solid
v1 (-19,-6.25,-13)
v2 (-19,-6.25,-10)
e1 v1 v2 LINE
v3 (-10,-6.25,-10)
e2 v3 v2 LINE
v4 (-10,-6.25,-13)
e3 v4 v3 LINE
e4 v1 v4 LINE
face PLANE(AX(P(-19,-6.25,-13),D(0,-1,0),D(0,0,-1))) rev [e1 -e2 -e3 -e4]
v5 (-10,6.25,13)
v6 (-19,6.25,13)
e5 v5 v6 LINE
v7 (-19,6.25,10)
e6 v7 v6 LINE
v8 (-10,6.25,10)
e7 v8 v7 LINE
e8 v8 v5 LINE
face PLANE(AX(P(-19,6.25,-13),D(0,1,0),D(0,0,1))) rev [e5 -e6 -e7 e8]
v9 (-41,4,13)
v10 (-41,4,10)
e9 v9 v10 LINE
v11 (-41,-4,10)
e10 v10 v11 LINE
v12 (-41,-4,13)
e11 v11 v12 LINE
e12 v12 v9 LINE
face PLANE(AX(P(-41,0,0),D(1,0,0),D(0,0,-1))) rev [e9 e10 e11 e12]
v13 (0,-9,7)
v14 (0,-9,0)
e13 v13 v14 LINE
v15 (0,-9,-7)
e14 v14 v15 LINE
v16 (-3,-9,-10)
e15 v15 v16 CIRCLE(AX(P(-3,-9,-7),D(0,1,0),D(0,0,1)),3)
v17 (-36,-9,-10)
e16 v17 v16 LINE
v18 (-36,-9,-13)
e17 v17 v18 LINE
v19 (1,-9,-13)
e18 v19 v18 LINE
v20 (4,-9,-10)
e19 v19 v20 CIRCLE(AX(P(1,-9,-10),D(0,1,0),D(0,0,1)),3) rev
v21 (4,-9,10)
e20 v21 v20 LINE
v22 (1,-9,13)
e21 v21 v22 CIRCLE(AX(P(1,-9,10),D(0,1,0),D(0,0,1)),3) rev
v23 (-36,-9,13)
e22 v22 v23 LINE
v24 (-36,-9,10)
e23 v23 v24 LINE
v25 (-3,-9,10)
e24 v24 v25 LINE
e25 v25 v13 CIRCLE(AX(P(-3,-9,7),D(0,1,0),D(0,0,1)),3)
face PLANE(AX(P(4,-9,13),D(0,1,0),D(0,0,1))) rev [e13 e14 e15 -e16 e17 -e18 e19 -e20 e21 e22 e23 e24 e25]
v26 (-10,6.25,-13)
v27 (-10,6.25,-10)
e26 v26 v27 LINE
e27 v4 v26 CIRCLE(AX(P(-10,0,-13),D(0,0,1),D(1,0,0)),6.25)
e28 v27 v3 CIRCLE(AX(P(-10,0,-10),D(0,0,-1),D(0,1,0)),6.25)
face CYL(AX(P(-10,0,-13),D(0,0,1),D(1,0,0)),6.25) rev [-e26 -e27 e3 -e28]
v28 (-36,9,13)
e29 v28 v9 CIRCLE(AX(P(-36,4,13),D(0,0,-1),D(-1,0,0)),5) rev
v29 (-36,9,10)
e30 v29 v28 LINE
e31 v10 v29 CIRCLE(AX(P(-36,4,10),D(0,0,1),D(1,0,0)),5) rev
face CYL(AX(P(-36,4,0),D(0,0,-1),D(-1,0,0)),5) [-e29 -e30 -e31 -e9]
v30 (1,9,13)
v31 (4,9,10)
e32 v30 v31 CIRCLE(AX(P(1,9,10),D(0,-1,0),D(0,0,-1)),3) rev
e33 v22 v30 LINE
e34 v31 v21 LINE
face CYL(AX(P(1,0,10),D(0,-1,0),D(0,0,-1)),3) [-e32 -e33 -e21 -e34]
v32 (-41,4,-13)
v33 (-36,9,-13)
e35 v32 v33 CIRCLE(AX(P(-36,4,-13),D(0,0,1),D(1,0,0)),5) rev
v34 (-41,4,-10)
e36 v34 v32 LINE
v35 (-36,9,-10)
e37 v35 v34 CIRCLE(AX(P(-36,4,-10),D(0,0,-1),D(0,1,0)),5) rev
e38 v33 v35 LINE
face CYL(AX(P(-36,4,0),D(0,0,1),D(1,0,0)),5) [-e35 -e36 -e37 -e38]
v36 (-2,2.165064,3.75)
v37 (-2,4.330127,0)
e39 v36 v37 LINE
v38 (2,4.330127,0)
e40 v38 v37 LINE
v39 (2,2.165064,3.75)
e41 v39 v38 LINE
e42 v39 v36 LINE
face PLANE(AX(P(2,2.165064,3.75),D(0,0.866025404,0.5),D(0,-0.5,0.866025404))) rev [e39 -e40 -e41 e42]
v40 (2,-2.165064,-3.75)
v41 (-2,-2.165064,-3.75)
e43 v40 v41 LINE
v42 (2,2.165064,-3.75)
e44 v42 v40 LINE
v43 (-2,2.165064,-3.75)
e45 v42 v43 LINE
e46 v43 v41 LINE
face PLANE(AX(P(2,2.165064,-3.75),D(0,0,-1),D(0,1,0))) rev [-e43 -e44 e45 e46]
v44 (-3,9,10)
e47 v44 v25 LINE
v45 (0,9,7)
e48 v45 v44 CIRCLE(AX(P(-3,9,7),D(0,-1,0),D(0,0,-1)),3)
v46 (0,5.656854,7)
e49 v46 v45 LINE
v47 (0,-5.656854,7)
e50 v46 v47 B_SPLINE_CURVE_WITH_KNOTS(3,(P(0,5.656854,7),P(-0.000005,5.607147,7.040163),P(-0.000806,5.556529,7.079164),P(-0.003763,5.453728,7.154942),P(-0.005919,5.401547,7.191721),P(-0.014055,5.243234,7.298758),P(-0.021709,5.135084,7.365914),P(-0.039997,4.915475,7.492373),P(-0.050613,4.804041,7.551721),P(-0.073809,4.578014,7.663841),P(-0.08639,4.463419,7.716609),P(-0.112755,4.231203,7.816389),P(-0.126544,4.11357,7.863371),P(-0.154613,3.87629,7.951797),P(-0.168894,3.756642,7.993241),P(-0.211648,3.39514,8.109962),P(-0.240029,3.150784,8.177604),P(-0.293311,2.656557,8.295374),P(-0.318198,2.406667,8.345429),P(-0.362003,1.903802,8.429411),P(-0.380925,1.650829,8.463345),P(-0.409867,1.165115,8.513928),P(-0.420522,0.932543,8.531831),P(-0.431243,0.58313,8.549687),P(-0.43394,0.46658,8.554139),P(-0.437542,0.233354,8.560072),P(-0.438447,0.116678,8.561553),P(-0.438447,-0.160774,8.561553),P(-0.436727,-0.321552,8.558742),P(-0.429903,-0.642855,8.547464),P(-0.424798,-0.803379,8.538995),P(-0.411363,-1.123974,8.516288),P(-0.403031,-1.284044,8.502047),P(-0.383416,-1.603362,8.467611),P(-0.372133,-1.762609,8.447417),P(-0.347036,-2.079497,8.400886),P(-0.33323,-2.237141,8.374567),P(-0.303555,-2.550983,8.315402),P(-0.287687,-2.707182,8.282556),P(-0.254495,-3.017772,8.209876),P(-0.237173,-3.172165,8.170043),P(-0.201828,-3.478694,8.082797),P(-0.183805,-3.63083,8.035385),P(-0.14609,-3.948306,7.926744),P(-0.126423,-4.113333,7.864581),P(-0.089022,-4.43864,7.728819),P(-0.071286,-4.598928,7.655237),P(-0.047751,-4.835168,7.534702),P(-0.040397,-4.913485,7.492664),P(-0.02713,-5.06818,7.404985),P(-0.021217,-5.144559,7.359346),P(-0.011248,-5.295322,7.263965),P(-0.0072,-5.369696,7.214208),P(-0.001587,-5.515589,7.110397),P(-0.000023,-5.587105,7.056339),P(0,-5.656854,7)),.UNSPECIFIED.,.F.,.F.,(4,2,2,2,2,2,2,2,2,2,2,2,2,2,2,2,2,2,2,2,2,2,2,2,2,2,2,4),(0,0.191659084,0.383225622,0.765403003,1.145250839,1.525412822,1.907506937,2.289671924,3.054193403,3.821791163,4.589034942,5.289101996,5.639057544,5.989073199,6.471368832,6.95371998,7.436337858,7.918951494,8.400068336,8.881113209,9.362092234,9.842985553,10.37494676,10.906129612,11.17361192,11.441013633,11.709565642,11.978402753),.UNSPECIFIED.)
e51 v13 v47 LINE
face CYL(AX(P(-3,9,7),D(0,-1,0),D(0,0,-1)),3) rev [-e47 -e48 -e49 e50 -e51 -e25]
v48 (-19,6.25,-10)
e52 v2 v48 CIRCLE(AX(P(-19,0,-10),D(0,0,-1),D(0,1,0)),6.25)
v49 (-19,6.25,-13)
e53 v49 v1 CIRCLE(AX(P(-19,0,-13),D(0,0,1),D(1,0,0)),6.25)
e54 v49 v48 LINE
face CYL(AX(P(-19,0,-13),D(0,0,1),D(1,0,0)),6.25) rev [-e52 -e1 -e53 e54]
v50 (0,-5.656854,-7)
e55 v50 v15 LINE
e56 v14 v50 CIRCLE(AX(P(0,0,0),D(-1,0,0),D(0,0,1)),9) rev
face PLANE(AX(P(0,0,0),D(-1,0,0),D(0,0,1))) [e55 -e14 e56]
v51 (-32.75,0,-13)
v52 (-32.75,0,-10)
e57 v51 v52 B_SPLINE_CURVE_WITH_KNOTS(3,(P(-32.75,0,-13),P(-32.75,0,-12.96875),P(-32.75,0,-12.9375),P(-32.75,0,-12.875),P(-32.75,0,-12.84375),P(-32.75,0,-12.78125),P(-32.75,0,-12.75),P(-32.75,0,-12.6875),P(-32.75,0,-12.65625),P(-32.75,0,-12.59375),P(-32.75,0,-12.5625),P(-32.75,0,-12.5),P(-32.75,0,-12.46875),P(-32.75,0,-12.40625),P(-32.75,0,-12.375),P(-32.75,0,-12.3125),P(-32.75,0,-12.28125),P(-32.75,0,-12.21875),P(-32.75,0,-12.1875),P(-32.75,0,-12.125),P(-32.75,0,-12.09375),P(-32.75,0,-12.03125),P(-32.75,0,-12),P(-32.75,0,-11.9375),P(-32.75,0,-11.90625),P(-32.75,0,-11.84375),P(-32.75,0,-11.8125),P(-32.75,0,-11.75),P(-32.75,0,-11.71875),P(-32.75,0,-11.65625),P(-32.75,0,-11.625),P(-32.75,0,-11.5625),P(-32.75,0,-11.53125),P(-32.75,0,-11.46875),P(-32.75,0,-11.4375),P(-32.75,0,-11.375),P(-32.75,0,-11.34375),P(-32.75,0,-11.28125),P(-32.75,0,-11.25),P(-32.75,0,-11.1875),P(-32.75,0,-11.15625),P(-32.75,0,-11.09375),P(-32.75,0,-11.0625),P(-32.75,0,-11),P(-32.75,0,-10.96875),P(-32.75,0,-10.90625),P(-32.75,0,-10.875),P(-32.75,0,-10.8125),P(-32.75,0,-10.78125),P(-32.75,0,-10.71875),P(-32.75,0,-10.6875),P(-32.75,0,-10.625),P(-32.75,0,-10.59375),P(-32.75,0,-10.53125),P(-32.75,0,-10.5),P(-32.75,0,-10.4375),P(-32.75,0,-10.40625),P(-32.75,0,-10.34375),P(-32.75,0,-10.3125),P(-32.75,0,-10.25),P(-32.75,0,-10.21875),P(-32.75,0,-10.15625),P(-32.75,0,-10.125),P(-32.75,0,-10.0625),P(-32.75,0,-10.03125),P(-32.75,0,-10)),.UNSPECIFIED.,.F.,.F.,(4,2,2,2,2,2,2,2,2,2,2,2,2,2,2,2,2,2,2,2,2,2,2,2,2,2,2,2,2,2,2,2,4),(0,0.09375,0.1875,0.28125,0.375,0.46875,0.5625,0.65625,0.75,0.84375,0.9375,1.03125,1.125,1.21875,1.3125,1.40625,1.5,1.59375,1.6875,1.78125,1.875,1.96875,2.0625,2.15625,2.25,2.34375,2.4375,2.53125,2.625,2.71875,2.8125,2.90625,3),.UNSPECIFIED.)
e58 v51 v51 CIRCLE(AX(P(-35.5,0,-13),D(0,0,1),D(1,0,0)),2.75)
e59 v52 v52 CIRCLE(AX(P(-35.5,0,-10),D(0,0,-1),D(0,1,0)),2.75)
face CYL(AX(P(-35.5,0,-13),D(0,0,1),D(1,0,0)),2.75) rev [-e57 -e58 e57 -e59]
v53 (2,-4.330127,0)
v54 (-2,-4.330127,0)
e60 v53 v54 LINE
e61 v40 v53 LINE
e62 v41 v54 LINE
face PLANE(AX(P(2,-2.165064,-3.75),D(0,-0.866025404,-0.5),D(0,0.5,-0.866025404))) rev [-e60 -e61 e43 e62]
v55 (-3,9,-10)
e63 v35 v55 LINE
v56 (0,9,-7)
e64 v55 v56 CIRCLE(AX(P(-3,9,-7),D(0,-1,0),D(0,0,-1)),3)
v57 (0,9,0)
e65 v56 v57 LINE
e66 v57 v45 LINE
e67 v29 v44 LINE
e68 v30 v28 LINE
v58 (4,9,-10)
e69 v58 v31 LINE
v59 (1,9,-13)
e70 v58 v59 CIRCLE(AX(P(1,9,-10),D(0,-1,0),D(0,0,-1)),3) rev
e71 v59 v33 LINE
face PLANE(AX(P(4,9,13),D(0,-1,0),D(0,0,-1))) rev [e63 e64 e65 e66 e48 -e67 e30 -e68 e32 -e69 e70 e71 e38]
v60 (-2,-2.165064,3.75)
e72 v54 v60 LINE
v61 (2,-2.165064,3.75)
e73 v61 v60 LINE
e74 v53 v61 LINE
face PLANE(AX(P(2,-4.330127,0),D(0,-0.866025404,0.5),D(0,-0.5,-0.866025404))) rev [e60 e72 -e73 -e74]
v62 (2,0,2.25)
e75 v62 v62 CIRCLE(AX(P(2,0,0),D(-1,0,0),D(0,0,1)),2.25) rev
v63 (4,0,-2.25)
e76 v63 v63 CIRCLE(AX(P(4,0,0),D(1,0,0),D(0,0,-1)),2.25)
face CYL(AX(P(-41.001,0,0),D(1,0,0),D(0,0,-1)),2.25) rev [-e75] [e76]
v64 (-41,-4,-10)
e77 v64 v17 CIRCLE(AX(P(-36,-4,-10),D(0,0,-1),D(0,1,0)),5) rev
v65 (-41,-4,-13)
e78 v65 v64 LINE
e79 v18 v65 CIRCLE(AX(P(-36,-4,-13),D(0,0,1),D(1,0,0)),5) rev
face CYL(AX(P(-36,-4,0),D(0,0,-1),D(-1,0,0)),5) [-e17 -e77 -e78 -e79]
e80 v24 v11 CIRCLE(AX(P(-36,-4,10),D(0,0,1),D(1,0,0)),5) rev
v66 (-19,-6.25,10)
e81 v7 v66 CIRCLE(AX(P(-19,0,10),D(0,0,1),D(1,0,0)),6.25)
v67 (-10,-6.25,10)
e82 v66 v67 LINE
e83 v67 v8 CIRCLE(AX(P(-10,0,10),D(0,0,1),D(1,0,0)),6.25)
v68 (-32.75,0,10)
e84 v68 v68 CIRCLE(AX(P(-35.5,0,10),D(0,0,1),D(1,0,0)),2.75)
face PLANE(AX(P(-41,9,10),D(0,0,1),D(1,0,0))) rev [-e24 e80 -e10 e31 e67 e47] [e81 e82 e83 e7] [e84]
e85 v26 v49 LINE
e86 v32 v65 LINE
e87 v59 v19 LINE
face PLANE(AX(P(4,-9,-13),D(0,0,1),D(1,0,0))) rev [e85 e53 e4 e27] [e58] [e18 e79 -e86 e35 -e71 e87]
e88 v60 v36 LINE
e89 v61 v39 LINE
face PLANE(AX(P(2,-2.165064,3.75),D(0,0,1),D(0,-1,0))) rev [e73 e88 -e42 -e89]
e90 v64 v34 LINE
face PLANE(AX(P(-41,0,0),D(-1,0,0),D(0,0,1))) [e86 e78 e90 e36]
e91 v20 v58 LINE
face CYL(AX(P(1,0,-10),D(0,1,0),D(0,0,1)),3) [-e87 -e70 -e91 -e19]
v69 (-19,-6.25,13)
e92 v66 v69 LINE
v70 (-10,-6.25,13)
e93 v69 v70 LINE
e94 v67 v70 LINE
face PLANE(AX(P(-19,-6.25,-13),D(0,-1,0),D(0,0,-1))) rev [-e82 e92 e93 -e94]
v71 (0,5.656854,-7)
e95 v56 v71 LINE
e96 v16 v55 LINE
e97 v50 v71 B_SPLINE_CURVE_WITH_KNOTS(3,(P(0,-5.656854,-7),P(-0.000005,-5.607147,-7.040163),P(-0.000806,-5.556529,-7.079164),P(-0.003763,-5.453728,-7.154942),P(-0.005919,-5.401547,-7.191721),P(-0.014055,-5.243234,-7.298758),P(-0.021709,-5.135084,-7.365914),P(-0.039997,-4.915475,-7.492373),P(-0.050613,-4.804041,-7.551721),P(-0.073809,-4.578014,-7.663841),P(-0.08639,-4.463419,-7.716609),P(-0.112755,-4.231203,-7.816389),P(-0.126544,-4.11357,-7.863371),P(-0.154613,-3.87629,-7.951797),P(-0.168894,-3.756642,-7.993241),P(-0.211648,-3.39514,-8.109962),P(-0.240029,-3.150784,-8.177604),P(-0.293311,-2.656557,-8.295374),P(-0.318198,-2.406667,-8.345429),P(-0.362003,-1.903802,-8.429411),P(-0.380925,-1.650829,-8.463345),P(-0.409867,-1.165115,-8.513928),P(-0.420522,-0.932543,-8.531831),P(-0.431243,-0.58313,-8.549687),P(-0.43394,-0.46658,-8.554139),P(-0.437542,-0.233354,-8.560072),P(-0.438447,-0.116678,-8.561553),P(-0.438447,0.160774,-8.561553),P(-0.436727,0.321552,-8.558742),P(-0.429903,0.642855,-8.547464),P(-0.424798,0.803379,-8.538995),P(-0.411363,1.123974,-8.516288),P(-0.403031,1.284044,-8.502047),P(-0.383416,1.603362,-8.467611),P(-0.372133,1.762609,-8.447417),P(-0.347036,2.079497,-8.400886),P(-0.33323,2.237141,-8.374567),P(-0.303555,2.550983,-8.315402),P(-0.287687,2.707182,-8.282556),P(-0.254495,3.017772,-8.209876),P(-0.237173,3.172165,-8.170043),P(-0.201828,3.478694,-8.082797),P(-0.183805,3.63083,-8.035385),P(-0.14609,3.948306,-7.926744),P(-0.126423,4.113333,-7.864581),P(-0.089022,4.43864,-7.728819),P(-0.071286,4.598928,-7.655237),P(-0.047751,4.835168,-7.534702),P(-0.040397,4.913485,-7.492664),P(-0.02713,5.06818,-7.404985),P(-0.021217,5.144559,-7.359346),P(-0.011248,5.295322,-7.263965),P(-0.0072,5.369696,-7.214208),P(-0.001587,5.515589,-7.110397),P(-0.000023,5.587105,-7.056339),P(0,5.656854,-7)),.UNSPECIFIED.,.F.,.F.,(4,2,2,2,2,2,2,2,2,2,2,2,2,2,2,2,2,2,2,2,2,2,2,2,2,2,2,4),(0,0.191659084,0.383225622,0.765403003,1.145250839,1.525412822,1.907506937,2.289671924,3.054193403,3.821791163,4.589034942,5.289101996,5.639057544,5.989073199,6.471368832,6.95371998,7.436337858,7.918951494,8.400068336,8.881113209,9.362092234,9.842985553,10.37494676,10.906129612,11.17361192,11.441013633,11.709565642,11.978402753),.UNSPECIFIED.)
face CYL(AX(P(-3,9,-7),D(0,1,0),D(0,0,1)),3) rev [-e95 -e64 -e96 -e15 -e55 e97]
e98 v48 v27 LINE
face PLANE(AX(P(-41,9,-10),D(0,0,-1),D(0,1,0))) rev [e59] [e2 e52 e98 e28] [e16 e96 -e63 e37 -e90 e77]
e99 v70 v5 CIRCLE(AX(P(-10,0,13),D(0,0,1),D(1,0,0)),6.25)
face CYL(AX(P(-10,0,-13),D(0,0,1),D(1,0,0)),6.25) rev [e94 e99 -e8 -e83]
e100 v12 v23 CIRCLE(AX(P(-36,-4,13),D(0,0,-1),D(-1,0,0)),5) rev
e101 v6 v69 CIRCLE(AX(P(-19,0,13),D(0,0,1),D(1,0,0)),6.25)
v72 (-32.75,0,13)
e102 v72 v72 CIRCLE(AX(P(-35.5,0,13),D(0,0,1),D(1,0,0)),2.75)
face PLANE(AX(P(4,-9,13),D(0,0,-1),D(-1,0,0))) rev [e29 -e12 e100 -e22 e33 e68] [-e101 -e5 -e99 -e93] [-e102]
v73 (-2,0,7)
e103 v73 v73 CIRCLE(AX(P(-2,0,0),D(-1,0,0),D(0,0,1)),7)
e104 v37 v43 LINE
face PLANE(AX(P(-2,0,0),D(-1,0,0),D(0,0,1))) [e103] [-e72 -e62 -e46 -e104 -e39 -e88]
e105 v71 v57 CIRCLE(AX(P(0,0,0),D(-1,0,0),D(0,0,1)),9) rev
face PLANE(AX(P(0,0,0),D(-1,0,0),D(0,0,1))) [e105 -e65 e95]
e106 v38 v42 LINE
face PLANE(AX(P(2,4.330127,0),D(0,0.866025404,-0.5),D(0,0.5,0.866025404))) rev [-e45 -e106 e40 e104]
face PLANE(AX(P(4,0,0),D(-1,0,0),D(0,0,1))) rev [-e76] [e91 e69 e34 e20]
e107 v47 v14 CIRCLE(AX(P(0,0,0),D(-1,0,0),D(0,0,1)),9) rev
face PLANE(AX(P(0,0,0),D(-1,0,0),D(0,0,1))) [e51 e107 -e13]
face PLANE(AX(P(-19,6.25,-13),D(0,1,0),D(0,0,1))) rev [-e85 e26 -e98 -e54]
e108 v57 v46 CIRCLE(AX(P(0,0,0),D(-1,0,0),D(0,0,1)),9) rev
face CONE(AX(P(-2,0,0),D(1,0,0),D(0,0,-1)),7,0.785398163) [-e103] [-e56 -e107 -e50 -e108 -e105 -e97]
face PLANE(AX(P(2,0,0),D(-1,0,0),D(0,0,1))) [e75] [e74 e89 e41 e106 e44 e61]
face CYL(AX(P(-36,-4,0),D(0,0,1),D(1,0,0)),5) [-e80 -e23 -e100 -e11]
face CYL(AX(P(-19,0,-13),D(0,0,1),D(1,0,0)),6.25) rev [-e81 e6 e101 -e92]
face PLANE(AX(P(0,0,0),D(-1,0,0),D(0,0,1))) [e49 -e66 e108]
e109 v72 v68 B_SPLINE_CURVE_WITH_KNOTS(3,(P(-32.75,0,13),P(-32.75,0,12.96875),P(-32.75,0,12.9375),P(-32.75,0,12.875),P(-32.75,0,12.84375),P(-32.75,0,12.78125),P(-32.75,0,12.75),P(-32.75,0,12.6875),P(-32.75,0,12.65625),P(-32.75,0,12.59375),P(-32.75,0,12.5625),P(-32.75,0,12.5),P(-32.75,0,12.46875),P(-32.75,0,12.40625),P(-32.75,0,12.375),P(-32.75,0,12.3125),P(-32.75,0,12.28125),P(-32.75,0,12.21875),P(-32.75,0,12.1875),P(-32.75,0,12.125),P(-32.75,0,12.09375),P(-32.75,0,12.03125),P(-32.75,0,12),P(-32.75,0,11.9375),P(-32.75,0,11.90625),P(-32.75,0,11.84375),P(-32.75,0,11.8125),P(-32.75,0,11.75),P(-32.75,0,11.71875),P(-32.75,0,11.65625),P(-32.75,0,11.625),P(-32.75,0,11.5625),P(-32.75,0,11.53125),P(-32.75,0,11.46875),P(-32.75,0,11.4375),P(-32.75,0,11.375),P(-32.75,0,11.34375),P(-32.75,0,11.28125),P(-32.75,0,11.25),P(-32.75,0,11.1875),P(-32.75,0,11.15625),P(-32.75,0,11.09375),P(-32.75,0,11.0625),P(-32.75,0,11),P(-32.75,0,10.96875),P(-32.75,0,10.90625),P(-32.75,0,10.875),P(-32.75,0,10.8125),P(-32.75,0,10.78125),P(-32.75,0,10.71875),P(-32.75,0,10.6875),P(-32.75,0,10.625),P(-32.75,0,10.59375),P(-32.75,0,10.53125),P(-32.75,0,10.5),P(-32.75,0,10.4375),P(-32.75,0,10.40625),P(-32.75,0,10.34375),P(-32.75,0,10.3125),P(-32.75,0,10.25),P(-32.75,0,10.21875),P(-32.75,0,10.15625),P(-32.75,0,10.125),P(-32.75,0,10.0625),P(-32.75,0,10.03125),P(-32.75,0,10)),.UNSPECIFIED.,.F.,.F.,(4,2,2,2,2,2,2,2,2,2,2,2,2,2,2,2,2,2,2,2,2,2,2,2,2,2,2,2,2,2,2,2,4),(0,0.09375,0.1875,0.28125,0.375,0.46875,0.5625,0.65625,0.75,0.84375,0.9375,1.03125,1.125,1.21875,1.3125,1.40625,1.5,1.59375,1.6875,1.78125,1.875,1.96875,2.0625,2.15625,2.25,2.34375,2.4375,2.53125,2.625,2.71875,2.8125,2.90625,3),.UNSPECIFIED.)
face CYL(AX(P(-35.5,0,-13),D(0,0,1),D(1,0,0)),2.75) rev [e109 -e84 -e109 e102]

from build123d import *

# Parameters (mm, degrees)
SKETCH1_W           = 26
SKETCH1_H           = 18
BOSS_EXTRUDE1_DEPTH = 4
SKETCH2_W           = 3
SKETCH2_H           = 18
BOSS_EXTRUDE2_DEPTH = 41
SKETCH3_R           = 2.75
CUT_EXTRUDE1_DEPTH  = 50.376107583
FILLET1_R           = 3
FILLET2_R           = 5
SKETCH5_R           = 7
BOSS_EXTRUDE3_DEPTH = 2
CUT_EXTRUDE3_REACH  = 49.697
SKETCH7_R           = 2.25
CUT_EXTRUDE4_DEPTH  = 4
CHAMFER1_SIZE       = 2
CUT_EXTRUDE5_DEPTH  = 50.376107601


with BuildPart() as part:
    # Sketch1 → Boss-Extrude1 (new body)
    with BuildSketch(Plane(origin=(0, 0, 0), x_dir=(0, 0, -1), z_dir=(1, 0, 0))):
        Rectangle(SKETCH1_W, SKETCH1_H)
    extrude(amount=BOSS_EXTRUDE1_DEPTH)

    # Sketch2 → Boss-Extrude2 (add)
    with BuildSketch(Plane.ZY):
        with Locations((-11.5, 0)):
            Rectangle(SKETCH2_W, SKETCH2_H)
        with Locations((11.5, 0)):
            Rectangle(SKETCH2_W, SKETCH2_H)
    extrude(amount=BOSS_EXTRUDE2_DEPTH)

    # Sketch3 → Cut-Extrude1 (cut, through all)
    with BuildSketch(Plane.XY.offset(13)):
        with Locations((-35.5, 0)):
            Circle(SKETCH3_R)
    extrude(amount=-CUT_EXTRUDE1_DEPTH, mode=Mode.SUBTRACT)

    # Fillet1
    fillet1_edges = [part.edges().sort_by_distance(p)[0] for p in [
        (4, 0, 13),
        (0, 0, -10),
        (0, 0, 10),
        (4, 0, -13),
    ]]
    fillet(fillet1_edges, radius=FILLET1_R)

    # Fillet2
    fillet2_edges = [part.edges().sort_by_distance(p)[0] for p in [
        (-41, -9, -11.5),
        (-41, 9, -11.5),
        (-41, 9, 11.5),
        (-41, -9, 11.5),
    ]]
    fillet(fillet2_edges, radius=FILLET2_R)

    # Sketch5 → Boss-Extrude3 (add)
    with BuildSketch(Plane.ZY):
        Circle(SKETCH5_R)
    extrude(amount=BOSS_EXTRUDE3_DEPTH)

    # Sketch7 → Cut-Extrude3 (cut, up to next)
    with BuildSketch(Plane(origin=(4, 0, 0), x_dir=(0, 0, -1), z_dir=(1, 0, 0)), mode=Mode.PRIVATE) as cut_extrude3_sk1:
        Circle(SKETCH7_R)
    cut_extrude3_tool1 = extrude(cut_extrude3_sk1.sketch, amount=-CUT_EXTRUDE3_REACH, mode=Mode.PRIVATE) & part.part
    add(cut_extrude3_tool1.solids().sort_by_distance((4, 0, 0))[0], mode=Mode.SUBTRACT)

    # Sketch8 → Cut-Extrude4 (cut)
    with BuildSketch(Plane.ZY.offset(2)):
        Polygon((0, 4.330127019), (-3.75, 2.165063509), (-3.75, -2.165063509), (0, -4.330127019), (3.75, -2.165063509), (3.75, 2.165063509), align=None)
    extrude(amount=-CUT_EXTRUDE4_DEPTH, mode=Mode.SUBTRACT)

    # Chamfer1
    # the kernel refuses this chamfer: 2 mm, written as the material it adds along each edge
    with BuildSketch(Plane(origin=(0, 0, 0), x_dir=(0, 0, 1), z_dir=(0, -1, 0))) as chamfer1_piece_1_section:
        Polygon((7 + CHAMFER1_SIZE, 0), (7, CHAMFER1_SIZE), (7, 0), align=None)
    chamfer1_piece_1 = revolve(axis=Axis((0, 0, 0), (-1, 0, 0)), revolution_arc=180.000000041, mode=Mode.PRIVATE)
    chamfer1_piece_1 = split(chamfer1_piece_1, bisect_by=Plane(origin=(-0.945175713, 9, -3e-09), z_dir=(0, -1, 0)), keep=Keep.TOP, mode=Mode.PRIVATE)
    chamfer1_piece_1 = split(chamfer1_piece_1, bisect_by=Plane(origin=(-2, 8.001744255, -3e-09), z_dir=(1, 0, 0)), keep=Keep.TOP, mode=Mode.PRIVATE)
    add(chamfer1_piece_1)
    with BuildSketch(Plane(origin=(0, 0, 0), x_dir=(0, -7.23525117256177e-10, -1.0), z_dir=(0, 1.0, -7.23525117256177e-10))) as chamfer1_piece_2_section:
        Polygon((7 + CHAMFER1_SIZE, 0), (7, CHAMFER1_SIZE), (7, 0), align=None)
    chamfer1_piece_2 = revolve(axis=Axis((0, 0, 0), (-1, 0, 0)), revolution_arc=179.999999959, mode=Mode.PRIVATE)
    chamfer1_piece_2 = split(chamfer1_piece_2, bisect_by=Plane(origin=(-0.945175715, -9, 3e-09), z_dir=(0, 1, 0)), keep=Keep.TOP, mode=Mode.PRIVATE)
    chamfer1_piece_2 = split(chamfer1_piece_2, bisect_by=Plane(origin=(-2, -8.001744258, 3e-09), z_dir=(1, 0, 0)), keep=Keep.TOP, mode=Mode.PRIVATE)
    add(chamfer1_piece_2)

    # Sketch9 → Cut-Extrude5 (cut, through all)
    with BuildSketch(Plane.XY.offset(13)):
        with BuildLine():
            Line((-19, 6.25), (-10, 6.25))
            ThreePointArc((-10, 6.25), (-3.75, 0), (-10, -6.25))
            Line((-10, -6.25), (-19, -6.25))
            ThreePointArc((-19, -6.25), (-25.25, 0), (-19, 6.25))
        make_face()
    extrude(amount=-CUT_EXTRUDE5_DEPTH, mode=Mode.SUBTRACT)


solid = part.part
